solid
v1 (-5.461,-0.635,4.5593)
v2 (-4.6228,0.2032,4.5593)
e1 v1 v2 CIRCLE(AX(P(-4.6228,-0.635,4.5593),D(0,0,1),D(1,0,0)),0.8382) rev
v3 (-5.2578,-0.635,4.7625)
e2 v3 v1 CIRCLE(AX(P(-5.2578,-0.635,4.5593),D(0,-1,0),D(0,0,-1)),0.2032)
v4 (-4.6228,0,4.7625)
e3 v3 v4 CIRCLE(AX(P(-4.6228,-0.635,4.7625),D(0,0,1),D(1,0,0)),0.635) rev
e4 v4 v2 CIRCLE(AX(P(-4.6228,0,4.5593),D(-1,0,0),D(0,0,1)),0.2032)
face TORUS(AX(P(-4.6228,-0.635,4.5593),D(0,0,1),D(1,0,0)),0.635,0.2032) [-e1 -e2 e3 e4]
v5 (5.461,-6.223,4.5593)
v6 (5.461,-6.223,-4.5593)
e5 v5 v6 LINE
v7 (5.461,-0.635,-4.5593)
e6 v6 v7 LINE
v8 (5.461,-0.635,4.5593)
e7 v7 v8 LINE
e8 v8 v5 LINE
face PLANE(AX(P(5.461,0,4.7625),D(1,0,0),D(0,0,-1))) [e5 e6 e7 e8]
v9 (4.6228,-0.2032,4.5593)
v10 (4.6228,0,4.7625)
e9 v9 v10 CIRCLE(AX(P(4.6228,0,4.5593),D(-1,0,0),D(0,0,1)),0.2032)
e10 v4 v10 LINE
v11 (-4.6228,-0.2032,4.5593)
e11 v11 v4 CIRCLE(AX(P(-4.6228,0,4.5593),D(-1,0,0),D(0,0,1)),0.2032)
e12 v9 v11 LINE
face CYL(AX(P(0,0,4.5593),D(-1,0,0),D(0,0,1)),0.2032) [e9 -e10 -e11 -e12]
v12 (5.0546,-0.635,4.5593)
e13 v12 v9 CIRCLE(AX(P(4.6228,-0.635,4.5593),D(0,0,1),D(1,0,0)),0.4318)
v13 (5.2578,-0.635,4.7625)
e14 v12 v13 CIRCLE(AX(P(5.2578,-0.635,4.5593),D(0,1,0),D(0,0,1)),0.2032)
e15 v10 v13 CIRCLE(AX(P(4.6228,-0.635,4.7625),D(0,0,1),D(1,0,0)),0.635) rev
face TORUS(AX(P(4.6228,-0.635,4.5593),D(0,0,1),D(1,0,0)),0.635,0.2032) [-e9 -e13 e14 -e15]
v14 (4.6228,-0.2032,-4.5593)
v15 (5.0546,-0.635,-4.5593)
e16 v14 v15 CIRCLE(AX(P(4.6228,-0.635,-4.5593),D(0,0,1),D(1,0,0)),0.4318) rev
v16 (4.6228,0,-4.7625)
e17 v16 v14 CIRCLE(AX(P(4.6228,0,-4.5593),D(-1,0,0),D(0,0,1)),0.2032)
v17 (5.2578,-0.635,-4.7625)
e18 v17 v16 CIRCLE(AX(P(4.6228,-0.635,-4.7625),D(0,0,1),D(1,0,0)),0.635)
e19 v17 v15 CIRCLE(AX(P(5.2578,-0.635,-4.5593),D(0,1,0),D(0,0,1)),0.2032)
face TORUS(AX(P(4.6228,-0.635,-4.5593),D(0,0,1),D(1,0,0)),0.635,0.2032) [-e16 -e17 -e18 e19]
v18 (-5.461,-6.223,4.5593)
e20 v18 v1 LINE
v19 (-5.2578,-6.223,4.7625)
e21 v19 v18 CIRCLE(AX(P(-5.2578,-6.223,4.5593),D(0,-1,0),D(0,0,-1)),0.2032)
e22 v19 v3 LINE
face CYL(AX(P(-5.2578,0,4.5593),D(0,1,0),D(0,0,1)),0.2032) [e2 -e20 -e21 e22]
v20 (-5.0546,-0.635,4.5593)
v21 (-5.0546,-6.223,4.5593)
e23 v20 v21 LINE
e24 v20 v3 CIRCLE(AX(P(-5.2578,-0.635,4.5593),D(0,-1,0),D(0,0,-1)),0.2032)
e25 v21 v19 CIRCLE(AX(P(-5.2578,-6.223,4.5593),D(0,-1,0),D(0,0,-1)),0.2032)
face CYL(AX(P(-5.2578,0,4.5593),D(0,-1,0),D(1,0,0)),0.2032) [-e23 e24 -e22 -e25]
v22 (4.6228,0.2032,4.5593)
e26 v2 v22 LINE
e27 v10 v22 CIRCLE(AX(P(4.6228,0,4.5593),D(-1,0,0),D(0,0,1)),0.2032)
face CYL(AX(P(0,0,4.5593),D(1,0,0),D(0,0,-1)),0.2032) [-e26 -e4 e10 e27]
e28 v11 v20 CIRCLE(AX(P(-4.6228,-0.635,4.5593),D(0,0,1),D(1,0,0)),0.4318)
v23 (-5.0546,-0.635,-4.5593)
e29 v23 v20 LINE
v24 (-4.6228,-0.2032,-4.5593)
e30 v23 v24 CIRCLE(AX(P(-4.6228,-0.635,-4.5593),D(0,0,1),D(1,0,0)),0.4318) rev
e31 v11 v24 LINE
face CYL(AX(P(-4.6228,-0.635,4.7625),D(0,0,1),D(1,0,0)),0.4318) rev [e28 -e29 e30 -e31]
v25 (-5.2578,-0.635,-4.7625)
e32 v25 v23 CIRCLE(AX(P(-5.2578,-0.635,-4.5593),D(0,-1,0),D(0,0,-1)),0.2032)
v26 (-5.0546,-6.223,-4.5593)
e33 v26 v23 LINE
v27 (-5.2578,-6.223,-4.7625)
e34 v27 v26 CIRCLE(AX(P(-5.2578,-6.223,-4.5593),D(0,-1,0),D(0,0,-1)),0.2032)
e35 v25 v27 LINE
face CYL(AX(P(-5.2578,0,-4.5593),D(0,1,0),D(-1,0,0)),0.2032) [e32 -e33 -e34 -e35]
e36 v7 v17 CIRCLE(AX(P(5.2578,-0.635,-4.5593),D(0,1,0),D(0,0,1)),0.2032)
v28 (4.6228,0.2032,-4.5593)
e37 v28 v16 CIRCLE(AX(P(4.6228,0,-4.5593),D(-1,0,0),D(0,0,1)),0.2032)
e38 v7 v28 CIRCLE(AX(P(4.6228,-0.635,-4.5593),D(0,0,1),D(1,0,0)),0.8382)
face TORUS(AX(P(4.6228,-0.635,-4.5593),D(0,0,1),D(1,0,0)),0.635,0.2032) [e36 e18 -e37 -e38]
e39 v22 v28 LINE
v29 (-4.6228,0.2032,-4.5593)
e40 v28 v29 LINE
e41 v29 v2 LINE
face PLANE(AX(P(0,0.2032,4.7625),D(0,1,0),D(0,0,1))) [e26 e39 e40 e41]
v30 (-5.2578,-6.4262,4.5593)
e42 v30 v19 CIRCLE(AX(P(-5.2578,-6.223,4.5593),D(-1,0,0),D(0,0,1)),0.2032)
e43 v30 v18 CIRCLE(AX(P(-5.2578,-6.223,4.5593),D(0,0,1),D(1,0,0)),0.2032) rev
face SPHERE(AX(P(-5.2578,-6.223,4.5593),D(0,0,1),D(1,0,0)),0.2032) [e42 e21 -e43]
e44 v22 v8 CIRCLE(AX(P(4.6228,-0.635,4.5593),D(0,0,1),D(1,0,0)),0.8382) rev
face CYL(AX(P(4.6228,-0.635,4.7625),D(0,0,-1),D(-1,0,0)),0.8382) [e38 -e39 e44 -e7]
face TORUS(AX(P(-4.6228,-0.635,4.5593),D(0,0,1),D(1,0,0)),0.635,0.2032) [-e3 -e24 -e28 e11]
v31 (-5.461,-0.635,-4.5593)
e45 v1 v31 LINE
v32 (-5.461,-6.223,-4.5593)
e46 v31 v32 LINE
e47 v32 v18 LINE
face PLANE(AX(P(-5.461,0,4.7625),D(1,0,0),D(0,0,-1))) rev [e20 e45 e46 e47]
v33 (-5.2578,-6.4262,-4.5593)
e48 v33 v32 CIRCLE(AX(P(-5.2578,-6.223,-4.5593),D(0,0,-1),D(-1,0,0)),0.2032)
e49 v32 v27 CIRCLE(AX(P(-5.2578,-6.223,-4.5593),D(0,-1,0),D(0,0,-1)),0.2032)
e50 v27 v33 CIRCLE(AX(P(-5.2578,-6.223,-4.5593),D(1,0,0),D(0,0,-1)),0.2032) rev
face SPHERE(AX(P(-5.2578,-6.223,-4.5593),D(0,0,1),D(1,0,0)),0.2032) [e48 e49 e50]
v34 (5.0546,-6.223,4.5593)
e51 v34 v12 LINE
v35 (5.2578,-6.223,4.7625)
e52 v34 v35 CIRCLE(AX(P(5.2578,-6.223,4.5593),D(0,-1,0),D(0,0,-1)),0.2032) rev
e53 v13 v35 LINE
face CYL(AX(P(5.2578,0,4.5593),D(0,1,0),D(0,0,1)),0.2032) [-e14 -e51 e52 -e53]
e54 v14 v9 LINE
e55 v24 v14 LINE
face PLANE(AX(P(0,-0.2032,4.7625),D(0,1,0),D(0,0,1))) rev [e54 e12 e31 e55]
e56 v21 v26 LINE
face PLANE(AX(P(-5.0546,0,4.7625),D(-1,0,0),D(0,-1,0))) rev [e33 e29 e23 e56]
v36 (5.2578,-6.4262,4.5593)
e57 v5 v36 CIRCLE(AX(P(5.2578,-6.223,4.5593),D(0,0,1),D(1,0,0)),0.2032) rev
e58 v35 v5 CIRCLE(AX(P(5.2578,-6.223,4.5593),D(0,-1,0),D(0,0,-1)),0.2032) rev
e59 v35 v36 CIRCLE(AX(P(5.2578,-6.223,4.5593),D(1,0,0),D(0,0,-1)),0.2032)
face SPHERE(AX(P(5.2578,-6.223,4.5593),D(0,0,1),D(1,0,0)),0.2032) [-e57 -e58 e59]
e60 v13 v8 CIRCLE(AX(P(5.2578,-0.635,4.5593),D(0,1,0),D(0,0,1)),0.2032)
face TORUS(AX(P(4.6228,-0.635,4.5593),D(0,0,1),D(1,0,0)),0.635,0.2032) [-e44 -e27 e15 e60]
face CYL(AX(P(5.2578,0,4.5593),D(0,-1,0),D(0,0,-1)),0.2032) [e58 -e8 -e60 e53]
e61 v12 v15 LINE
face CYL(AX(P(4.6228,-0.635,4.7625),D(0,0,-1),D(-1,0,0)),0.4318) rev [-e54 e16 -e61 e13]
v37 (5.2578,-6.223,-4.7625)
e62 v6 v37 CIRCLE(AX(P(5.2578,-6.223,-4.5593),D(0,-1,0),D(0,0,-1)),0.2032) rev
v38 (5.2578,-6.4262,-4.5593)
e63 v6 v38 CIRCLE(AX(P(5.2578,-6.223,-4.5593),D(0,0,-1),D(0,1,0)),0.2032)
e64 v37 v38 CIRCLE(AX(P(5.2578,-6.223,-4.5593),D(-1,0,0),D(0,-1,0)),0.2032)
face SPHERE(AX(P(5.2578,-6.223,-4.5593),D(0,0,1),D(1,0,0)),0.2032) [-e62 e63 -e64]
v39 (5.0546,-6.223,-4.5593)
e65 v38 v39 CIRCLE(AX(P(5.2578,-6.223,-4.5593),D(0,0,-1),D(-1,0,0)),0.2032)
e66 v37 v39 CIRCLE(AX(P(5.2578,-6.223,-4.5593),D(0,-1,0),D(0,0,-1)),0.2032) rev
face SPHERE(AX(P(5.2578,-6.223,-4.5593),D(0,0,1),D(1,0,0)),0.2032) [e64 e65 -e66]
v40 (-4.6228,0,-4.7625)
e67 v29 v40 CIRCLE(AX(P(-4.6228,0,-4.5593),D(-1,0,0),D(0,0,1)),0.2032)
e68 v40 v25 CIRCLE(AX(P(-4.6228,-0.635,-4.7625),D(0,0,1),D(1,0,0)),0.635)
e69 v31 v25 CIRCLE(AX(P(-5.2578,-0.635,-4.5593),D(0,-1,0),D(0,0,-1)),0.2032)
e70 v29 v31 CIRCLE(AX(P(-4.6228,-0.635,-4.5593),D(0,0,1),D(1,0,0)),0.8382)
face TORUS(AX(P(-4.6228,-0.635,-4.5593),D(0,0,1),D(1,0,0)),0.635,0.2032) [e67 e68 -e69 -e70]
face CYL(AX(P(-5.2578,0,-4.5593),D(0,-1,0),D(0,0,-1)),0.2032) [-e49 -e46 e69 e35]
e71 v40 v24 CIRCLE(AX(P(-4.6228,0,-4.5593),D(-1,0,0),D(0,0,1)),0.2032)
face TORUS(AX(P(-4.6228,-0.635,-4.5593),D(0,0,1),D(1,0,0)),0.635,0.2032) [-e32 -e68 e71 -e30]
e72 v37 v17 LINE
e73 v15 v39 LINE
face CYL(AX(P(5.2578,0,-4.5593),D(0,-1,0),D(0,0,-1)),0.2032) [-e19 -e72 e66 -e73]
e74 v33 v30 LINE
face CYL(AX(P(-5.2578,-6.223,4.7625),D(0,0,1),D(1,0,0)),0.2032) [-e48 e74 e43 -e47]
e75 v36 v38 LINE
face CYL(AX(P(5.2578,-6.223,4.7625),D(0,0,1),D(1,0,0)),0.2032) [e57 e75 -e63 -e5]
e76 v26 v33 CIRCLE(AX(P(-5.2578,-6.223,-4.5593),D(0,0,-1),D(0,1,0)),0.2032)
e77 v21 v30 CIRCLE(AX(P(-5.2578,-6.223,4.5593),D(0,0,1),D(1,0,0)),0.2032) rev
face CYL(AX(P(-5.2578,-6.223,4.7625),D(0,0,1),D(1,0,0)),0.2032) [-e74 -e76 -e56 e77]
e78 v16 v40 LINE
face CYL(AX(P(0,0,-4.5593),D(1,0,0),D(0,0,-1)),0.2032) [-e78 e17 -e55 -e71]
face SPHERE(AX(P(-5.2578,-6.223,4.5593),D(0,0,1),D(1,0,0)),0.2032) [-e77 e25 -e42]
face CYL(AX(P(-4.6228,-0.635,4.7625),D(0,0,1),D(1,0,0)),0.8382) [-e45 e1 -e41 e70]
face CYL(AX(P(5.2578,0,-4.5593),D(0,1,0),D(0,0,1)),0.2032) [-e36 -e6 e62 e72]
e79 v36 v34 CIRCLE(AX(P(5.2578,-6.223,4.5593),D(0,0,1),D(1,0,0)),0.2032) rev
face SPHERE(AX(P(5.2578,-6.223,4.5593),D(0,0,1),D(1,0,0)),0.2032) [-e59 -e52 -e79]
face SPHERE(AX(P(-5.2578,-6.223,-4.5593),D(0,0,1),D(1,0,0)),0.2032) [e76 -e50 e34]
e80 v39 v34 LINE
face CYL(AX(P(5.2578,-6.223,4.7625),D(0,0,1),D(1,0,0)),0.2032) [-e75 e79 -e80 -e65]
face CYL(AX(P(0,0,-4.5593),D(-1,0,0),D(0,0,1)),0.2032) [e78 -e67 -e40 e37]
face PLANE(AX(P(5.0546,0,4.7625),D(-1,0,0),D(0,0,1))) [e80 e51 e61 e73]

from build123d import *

# Parameters (mm, degrees)
SKETCH1_W           = 10.922
SKETCH1_H           = 0.4064
SKETCH1_W_2         = 0.4064
SKETCH1_H_2         = 6.223
BOSS_EXTRUDE1_DEPTH = 4.7625
FILLET1_R           = 0.8382
FILLET2_R           = 0.4318
FILLET3_R           = 0.2032


with BuildPart() as part:
    # Sketch1 → Boss-Extrude1 (new, symmetric)
    with BuildSketch(Plane.XY):
        Rectangle(SKETCH1_W, SKETCH1_H)
        with Locations((-5.2578, -3.3147)):
            Rectangle(SKETCH1_W_2, SKETCH1_H_2)
        with Locations((5.2578, -3.3147)):
            Rectangle(SKETCH1_W_2, SKETCH1_H_2)
    extrude(amount=BOSS_EXTRUDE1_DEPTH, both=True)

    # Fillet1
    fillet1_edges = [part.edges().sort_by_distance(p)[0] for p in [
        (-5.461, 0.2032, 0),
        (5.461, 0.2032, 0),
    ]]
    fillet(fillet1_edges, radius=FILLET1_R)

    # Fillet2
    fillet2_edges = [part.edges().sort_by_distance(p)[0] for p in [
        (5.0546, -0.2032, 0),
        (-5.0546, -0.2032, 0),
    ]]
    fillet(fillet2_edges, radius=FILLET2_R)

    # Fillet3
    fillet3_edges = [part.edges().sort_by_distance(p)[0] for p in [
        (-5.0546, -3.5306, -4.7625),
        (-5.2578, -6.4262, -4.7625),
        (5.461, -6.4262, 0),
        (5.0546, -6.4262, 0),
        (-5.0546, -6.4262, 0),
        (-5.461, -6.4262, 0),
        (-5.2578, -6.4262, 4.7625),
        (-5.0546, -3.5306, 4.7625),
        (-5.461, -3.5306, -4.7625),
        (-5.461, -3.5306, 4.7625),
        (5.461, -3.5306, -4.7625),
        (0, 0.2032, -4.7625),
        (5.215496904, -0.042303096, -4.7625),
        (-5.215496904, -0.042303096, -4.7625),
        (0, 0.2032, 4.7625),
        (5.461, -3.5306, 4.7625),
        (5.215496904, -0.042303096, 4.7625),
        (5.0546, -3.5306, 4.7625),
        (-5.215496904, -0.042303096, 4.7625),
        (5.2578, -6.4262, 4.7625),
        (0, -0.2032, -4.7625),
        (0, -0.2032, 4.7625),
        (-4.928128708, -0.329671292, -4.7625),
        (-4.928128708, -0.329671292, 4.7625),
        (4.928128708, -0.329671292, -4.7625),
        (4.928128708, -0.329671292, 4.7625),
        (5.2578, -6.4262, -4.7625),
        (5.0546, -3.5306, -4.7625),
    ]]
    fillet(fillet3_edges, radius=FILLET3_R - 0.0001)  # a hair under: the kernel refuses the full size


solid = part.part
